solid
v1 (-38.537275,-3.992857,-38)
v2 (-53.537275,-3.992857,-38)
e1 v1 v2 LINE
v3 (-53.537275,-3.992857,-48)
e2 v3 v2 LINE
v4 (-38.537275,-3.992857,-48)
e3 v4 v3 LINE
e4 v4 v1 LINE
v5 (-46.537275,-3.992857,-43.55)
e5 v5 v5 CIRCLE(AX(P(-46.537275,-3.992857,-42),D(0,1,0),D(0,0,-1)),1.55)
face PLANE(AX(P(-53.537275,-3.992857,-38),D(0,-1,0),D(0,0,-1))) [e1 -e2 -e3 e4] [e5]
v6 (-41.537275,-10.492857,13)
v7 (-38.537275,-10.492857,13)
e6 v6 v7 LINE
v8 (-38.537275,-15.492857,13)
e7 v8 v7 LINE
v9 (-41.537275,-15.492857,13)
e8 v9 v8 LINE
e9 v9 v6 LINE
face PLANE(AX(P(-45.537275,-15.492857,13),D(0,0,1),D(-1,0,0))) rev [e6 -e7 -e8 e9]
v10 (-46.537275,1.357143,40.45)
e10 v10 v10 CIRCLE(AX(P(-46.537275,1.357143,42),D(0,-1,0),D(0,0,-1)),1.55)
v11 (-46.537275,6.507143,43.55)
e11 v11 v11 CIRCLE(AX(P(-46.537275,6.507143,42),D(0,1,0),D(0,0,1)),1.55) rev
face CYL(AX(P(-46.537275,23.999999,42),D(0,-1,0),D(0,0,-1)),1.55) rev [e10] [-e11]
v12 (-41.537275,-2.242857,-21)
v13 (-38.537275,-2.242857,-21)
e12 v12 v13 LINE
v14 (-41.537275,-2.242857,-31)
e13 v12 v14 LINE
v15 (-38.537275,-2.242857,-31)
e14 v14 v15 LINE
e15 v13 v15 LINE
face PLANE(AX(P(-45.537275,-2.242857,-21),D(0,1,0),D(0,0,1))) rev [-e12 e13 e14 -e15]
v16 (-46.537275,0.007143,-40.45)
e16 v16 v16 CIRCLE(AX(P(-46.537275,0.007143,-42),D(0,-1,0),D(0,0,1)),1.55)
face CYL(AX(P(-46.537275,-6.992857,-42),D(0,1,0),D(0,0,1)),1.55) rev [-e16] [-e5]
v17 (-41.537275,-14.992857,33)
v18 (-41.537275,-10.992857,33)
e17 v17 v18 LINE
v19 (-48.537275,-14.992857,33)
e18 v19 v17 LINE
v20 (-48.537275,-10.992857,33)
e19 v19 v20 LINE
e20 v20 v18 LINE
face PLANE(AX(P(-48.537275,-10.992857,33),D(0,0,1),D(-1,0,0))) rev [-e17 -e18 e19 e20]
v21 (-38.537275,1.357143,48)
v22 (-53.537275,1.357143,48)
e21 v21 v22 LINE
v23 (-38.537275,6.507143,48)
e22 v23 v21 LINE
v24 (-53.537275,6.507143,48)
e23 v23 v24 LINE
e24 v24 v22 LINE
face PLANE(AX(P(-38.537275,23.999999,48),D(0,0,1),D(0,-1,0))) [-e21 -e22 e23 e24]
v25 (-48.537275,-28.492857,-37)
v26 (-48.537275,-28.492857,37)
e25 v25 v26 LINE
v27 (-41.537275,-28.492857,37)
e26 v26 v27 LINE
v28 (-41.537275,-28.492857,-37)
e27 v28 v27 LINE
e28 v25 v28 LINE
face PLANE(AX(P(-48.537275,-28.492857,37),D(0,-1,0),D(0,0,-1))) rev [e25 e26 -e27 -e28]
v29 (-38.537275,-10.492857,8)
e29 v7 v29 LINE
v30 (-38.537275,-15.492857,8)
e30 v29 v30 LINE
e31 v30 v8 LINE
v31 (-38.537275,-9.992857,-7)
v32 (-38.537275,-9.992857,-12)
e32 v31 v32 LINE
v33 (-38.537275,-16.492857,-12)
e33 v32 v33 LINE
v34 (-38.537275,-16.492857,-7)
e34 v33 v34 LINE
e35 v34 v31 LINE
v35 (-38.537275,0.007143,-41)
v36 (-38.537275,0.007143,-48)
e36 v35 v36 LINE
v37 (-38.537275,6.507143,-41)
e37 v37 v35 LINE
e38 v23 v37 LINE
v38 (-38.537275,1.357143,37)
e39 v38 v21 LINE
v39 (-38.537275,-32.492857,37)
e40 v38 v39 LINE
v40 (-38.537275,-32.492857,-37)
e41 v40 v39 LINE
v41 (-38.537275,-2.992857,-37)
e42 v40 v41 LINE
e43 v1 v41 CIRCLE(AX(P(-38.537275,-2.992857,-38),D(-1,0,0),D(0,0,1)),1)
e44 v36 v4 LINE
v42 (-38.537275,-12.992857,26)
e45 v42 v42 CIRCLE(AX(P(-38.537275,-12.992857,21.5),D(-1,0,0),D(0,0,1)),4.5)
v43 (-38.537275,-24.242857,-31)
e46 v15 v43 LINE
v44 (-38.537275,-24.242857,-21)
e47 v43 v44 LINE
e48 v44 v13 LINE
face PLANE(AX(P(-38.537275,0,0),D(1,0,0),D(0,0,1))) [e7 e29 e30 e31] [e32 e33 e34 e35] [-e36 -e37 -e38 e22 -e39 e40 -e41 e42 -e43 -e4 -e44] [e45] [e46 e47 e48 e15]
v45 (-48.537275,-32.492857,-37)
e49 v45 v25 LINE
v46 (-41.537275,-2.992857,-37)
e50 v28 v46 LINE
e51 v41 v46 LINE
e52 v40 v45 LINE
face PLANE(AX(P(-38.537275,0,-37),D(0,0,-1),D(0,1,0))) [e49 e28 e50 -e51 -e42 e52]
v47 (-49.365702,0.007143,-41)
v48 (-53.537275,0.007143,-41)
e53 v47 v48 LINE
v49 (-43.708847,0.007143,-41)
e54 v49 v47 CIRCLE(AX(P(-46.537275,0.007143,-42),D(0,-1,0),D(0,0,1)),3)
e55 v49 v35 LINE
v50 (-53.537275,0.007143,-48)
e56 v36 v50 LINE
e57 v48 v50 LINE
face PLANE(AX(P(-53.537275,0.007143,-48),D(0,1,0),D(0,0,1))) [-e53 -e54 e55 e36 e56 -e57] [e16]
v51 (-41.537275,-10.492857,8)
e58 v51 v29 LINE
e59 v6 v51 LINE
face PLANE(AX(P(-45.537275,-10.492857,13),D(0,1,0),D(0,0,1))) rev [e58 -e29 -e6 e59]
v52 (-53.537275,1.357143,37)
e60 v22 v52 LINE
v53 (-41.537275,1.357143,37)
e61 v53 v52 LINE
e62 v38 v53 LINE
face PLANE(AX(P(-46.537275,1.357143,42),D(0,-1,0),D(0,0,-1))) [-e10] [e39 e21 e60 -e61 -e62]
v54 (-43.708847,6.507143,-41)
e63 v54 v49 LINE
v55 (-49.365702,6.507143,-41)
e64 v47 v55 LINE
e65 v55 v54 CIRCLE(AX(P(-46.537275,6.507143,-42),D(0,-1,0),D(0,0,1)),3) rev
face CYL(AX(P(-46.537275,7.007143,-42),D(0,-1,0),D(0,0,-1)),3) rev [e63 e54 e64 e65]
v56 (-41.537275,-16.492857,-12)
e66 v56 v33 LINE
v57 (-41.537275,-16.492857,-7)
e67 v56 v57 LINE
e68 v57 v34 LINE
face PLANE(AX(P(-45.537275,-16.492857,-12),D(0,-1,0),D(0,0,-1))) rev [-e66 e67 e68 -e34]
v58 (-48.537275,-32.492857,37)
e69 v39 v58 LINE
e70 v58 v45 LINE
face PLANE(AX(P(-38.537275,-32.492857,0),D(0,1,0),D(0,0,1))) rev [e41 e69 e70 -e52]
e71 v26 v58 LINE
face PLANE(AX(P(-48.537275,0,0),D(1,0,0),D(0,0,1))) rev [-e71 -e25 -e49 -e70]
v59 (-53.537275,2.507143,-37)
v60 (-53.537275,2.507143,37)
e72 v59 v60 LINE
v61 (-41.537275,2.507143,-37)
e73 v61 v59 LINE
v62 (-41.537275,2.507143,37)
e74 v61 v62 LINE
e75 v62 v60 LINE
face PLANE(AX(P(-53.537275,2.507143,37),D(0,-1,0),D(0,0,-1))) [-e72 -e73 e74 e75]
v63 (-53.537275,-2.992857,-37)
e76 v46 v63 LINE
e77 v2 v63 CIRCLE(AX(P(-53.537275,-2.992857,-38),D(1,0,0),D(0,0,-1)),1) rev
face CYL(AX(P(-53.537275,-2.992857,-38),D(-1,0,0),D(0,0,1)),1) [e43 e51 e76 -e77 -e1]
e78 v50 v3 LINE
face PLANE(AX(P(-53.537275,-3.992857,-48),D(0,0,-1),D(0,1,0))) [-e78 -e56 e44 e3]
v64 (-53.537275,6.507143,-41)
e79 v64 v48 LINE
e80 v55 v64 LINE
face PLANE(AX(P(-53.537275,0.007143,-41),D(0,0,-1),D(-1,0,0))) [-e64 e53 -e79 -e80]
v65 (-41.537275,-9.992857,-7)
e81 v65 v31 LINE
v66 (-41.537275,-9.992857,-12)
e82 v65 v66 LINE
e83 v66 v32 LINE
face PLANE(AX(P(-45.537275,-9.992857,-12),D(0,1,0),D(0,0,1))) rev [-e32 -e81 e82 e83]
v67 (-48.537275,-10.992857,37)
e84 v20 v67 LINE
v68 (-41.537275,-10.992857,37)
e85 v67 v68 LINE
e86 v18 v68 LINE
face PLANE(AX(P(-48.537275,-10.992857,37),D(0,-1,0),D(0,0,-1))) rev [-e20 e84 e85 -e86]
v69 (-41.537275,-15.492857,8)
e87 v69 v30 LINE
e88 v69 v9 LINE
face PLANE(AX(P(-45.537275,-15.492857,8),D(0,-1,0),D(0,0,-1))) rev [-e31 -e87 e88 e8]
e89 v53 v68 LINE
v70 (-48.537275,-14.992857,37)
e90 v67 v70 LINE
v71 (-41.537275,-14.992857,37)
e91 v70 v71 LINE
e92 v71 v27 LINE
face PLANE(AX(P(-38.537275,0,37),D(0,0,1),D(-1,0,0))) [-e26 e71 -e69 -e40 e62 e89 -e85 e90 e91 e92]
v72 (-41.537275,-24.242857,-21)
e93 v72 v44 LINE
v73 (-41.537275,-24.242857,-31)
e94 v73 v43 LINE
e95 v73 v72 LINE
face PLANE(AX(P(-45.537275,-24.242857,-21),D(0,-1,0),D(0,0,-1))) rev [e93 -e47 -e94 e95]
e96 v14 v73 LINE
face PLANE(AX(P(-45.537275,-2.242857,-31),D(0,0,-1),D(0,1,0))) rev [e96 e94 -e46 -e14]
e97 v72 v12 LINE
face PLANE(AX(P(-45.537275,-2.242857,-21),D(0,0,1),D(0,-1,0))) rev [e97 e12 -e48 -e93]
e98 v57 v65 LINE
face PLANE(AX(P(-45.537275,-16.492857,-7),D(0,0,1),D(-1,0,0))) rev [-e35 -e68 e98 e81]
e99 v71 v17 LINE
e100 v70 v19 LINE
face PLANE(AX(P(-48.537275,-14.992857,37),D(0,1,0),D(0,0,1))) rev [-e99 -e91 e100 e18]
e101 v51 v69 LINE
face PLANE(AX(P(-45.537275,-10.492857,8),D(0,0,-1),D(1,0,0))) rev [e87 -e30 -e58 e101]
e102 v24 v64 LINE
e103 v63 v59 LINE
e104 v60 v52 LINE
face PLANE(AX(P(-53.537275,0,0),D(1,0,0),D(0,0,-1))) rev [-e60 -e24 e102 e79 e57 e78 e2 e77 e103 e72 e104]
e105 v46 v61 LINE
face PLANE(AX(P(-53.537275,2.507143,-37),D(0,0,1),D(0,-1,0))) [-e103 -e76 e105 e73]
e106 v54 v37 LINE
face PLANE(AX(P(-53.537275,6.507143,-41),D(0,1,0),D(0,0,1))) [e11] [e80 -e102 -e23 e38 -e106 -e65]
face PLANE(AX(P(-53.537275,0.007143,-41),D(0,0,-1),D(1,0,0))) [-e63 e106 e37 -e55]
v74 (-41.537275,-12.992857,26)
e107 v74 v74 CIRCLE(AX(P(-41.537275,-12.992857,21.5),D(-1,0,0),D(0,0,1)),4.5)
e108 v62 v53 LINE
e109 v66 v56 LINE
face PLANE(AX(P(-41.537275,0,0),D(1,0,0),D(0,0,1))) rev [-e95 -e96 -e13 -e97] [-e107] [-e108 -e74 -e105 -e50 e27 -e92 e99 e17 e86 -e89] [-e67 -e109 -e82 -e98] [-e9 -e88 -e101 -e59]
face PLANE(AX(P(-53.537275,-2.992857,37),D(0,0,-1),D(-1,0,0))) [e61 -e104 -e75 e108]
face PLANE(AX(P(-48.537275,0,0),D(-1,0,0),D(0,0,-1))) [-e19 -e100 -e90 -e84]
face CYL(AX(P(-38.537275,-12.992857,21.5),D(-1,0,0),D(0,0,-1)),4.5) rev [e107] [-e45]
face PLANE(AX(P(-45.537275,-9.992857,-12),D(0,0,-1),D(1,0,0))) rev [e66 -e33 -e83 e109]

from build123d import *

# Parameters (mm, degrees)
EXTRUDE_START       = -12
EXTRUDE_1_DEPTH     = 12
SKETCH_2_R          = 4.5
EXTRUDE_2_DEPTH     = 3
SKETCH_3_W          = 74
SKETCH_3_H          = 4
SKETCH_3_W_2        = 4
EXTRUDE_3_DEPTH     = 7
SKETCH_4_W          = 5
SKETCH_4_H          = 6.5
SKETCH_4_H_2        = 5
SKETCH_4_W_2        = 10
SKETCH_4_H_3        = 22
CUT_EXTRUDE_1_DEPTH = 7
SKETCH_5_R          = 1.55
CUT_EXTRUDE_2_DEPTH = 7
SKETCH_6_R          = 3
CUT_EXTRUDE_4_DEPTH = 7
SKETCH_8_W          = 123.006467786
SKETCH_8_H          = 80.173858468
CUT_EXTRUDE_6_DEPTH = 15
SKETCH_11_R         = 1.55
EXTRUDE_5_DEPTH     = 5.15
CUT_EXTRUDE_8_REACH = 107.579
SKETCH_12_W         = 15.113452747
SKETCH_12_H         = 5.35


# Read off the part's stored shape, not the designer's step: 填料-伸長1
with BuildPart() as part:
    # 填料-伸長1 outline → 填料-伸長1 (new body)
    with BuildSketch(Plane.ZY.offset(65.537274581).offset(EXTRUDE_START)):
        with BuildLine():
            Line((41, 0.007142857), (41, 6.507142857))
            Line((41, 6.507142857), (-41, 6.507142857))
            Line((-41, 6.507142857), (-41, 0.007142857))
            Line((-41, 0.007142857), (-48, 0.007142857))
            Line((-48, 0.007142857), (-48, -3.992857143))
            Line((-48, -3.992857143), (-38, -3.992857143))
            ThreePointArc((-38, -3.992857143), (-37.292893219, -3.699963924), (-37, -2.992857143))
            Line((-37, -2.992857143), (-37, 2.507142857))
            Line((-37, 2.507142857), (37, 2.507142857))
            Line((37, 2.507142857), (37, -2.992857143))
            ThreePointArc((37, -2.992857143), (37.292893219, -3.699963924), (38, -3.992857143))
            Line((38, -3.992857143), (48, -3.992857143))
            Line((48, -3.992857143), (48, 0.007142857))
            Line((48, 0.007142857), (41, 0.007142857))
        make_face()
    extrude(amount=EXTRUDE_1_DEPTH)

    # 草圖2 → 填料-伸長2 (add)
    # profile 1 of 2: a face of its own
    with BuildSketch(Plane.ZY.offset(65.537274581)):
        Polygon((37, 2.507142857), (-37, 2.507142857), (-37, -2.992857143), (-37, -32.492857143), (37, -32.492857143), (37, -2.992857143), align=None)
        with Locations((21.5, -12.992857143)):
            Circle(SKETCH_2_R, mode=Mode.SUBTRACT)
    # profile 2 of 2: a face of its own
    with BuildSketch(Plane.ZY.offset(65.537274581)):
        with BuildLine():
            Line((41, 0.007142857), (41, 6.507142857))
            Line((41, 6.507142857), (-41, 6.507142857))
            Line((-41, 6.507142857), (-41, 0.007142857))
            Line((-41, 0.007142857), (-48, 0.007142857))
            Line((-48, 0.007142857), (-48, -3.992857143))
            Line((-48, -3.992857143), (-38, -3.992857143))
            ThreePointArc((-38, -3.992857143), (-37.292893219, -3.699963924), (-37, -2.992857143))
            Line((-37, -2.992857143), (-37, 2.507142857))
            Line((-37, 2.507142857), (37, 2.507142857))
            Line((37, 2.507142857), (37, -2.992857143))
            ThreePointArc((37, -2.992857143), (37.292893219, -3.699963924), (38, -3.992857143))
            Line((38, -3.992857143), (48, -3.992857143))
            Line((48, -3.992857143), (48, 0.007142857))
            Line((48, 0.007142857), (41, 0.007142857))
        make_face()
    extrude(amount=EXTRUDE_2_DEPTH)

    # 草圖3 → 填料-伸長3 (add)
    with BuildSketch(Plane(origin=(-65.537274581, 0, 0), x_dir=(0, 0, -1), z_dir=(1, 0, 0))):
        with Locations((0, -30.492857143)):
            Rectangle(SKETCH_3_W, SKETCH_3_H)
        with Locations((-35, -12.992857143)):
            Rectangle(SKETCH_3_W_2, SKETCH_3_H)
    extrude(amount=EXTRUDE_3_DEPTH)

    # 草圖4 → 除料-伸長1 (cut)
    with BuildSketch(Plane.ZY.offset(68.537274581)):
        with Locations((-9.5, -13.242857143)):
            Rectangle(SKETCH_4_W, SKETCH_4_H)
        with Locations((10.5, -12.992857143)):
            Rectangle(SKETCH_4_W, SKETCH_4_H_2)
        with Locations((-26, -13.242857143)):
            Rectangle(SKETCH_4_W_2, SKETCH_4_H_3)
    extrude(amount=-CUT_EXTRUDE_1_DEPTH, mode=Mode.SUBTRACT)

    # 草圖5 → 除料-伸長2 (cut)
    with BuildSketch(Plane(origin=(0, 0.007142857, 0), x_dir=(1, 0, 0), z_dir=(0, 1, 0))):
        with Locations(Location((-60.537274581, -42, 0), (0, 0, 40.17776954))):
            Circle(SKETCH_5_R)
        with Locations(Location((-60.537274581, 42, 0), (0, 0, 220.17776954))):
            Circle(SKETCH_5_R)
    extrude(amount=-CUT_EXTRUDE_2_DEPTH, mode=Mode.SUBTRACT)

    # 草圖6 → 除料-伸長4 (cut)
    with BuildSketch(Plane(origin=(0, 0.007142857, 0), x_dir=(1, 0, 0), z_dir=(0, 1, 0))):
        with Locations((-60.537274581, -42)):
            Circle(SKETCH_6_R)
        with Locations((-60.537274581, 42)):
            Circle(SKETCH_6_R)
    extrude(amount=CUT_EXTRUDE_4_DEPTH, mode=Mode.SUBTRACT)

    # 鏡射2: part across plane


with BuildPart() as part_1:
    add(part.part)
    add(part.part.mirror(Plane(origin=(-53.537274581, 0, 0), x_dir=(0, 0, 1), z_dir=(1, 0, 0))))

    # 草圖8 → 除料-伸長6 (cut)
    with BuildSketch(Plane(origin=(-53.537274581, 0, 0), x_dir=(0, 0, -1), z_dir=(1, 0, 0))):
        with Locations((-0.366090678, -13.819923092)):
            Rectangle(SKETCH_8_W, SKETCH_8_H)
    extrude(amount=-CUT_EXTRUDE_6_DEPTH, mode=Mode.SUBTRACT)

    # 草圖11 → 填料-伸長5 (add)
    with BuildSketch(Plane(origin=(0, 1.357142857, 0), x_dir=(-1, 0, 0), z_dir=(0, -1, 0))):
        with BuildLine():
            Line((53.537274581, -48), (53.537274581, -41))
            Line((53.537274581, -41), (49.365701705, -41))
            ThreePointArc((49.365701705, -41), (46.537274581, -39), (43.708847456, -41))
            Line((43.708847456, -41), (38.537274581, -41))
            Line((38.537274581, -41), (38.537274581, -48))
            Line((38.537274581, -48), (53.537274581, -48))
        make_face()
        with Locations(Location((46.537274581, -42, 0), (0, 0, 270))):
            Circle(SKETCH_11_R, mode=Mode.SUBTRACT)
    extrude(amount=-EXTRUDE_5_DEPTH)

    # 草圖12 → 除料-伸長8 (cut, up to next)
    with BuildSketch(Plane.XY.offset(37), mode=Mode.PRIVATE) as cut_extrude_8_sk1:
        with Locations((-46.094000955, -1.317857143)):
            Rectangle(SKETCH_12_W, SKETCH_12_H)
    cut_extrude_8_tool1 = extrude(cut_extrude_8_sk1.sketch, amount=CUT_EXTRUDE_8_REACH, mode=Mode.PRIVATE) & part_1.part
    add(cut_extrude_8_tool1.solids().sort_by_distance((-46.094001, -1.317857, 37))[0], mode=Mode.SUBTRACT)


solid = part_1.part
